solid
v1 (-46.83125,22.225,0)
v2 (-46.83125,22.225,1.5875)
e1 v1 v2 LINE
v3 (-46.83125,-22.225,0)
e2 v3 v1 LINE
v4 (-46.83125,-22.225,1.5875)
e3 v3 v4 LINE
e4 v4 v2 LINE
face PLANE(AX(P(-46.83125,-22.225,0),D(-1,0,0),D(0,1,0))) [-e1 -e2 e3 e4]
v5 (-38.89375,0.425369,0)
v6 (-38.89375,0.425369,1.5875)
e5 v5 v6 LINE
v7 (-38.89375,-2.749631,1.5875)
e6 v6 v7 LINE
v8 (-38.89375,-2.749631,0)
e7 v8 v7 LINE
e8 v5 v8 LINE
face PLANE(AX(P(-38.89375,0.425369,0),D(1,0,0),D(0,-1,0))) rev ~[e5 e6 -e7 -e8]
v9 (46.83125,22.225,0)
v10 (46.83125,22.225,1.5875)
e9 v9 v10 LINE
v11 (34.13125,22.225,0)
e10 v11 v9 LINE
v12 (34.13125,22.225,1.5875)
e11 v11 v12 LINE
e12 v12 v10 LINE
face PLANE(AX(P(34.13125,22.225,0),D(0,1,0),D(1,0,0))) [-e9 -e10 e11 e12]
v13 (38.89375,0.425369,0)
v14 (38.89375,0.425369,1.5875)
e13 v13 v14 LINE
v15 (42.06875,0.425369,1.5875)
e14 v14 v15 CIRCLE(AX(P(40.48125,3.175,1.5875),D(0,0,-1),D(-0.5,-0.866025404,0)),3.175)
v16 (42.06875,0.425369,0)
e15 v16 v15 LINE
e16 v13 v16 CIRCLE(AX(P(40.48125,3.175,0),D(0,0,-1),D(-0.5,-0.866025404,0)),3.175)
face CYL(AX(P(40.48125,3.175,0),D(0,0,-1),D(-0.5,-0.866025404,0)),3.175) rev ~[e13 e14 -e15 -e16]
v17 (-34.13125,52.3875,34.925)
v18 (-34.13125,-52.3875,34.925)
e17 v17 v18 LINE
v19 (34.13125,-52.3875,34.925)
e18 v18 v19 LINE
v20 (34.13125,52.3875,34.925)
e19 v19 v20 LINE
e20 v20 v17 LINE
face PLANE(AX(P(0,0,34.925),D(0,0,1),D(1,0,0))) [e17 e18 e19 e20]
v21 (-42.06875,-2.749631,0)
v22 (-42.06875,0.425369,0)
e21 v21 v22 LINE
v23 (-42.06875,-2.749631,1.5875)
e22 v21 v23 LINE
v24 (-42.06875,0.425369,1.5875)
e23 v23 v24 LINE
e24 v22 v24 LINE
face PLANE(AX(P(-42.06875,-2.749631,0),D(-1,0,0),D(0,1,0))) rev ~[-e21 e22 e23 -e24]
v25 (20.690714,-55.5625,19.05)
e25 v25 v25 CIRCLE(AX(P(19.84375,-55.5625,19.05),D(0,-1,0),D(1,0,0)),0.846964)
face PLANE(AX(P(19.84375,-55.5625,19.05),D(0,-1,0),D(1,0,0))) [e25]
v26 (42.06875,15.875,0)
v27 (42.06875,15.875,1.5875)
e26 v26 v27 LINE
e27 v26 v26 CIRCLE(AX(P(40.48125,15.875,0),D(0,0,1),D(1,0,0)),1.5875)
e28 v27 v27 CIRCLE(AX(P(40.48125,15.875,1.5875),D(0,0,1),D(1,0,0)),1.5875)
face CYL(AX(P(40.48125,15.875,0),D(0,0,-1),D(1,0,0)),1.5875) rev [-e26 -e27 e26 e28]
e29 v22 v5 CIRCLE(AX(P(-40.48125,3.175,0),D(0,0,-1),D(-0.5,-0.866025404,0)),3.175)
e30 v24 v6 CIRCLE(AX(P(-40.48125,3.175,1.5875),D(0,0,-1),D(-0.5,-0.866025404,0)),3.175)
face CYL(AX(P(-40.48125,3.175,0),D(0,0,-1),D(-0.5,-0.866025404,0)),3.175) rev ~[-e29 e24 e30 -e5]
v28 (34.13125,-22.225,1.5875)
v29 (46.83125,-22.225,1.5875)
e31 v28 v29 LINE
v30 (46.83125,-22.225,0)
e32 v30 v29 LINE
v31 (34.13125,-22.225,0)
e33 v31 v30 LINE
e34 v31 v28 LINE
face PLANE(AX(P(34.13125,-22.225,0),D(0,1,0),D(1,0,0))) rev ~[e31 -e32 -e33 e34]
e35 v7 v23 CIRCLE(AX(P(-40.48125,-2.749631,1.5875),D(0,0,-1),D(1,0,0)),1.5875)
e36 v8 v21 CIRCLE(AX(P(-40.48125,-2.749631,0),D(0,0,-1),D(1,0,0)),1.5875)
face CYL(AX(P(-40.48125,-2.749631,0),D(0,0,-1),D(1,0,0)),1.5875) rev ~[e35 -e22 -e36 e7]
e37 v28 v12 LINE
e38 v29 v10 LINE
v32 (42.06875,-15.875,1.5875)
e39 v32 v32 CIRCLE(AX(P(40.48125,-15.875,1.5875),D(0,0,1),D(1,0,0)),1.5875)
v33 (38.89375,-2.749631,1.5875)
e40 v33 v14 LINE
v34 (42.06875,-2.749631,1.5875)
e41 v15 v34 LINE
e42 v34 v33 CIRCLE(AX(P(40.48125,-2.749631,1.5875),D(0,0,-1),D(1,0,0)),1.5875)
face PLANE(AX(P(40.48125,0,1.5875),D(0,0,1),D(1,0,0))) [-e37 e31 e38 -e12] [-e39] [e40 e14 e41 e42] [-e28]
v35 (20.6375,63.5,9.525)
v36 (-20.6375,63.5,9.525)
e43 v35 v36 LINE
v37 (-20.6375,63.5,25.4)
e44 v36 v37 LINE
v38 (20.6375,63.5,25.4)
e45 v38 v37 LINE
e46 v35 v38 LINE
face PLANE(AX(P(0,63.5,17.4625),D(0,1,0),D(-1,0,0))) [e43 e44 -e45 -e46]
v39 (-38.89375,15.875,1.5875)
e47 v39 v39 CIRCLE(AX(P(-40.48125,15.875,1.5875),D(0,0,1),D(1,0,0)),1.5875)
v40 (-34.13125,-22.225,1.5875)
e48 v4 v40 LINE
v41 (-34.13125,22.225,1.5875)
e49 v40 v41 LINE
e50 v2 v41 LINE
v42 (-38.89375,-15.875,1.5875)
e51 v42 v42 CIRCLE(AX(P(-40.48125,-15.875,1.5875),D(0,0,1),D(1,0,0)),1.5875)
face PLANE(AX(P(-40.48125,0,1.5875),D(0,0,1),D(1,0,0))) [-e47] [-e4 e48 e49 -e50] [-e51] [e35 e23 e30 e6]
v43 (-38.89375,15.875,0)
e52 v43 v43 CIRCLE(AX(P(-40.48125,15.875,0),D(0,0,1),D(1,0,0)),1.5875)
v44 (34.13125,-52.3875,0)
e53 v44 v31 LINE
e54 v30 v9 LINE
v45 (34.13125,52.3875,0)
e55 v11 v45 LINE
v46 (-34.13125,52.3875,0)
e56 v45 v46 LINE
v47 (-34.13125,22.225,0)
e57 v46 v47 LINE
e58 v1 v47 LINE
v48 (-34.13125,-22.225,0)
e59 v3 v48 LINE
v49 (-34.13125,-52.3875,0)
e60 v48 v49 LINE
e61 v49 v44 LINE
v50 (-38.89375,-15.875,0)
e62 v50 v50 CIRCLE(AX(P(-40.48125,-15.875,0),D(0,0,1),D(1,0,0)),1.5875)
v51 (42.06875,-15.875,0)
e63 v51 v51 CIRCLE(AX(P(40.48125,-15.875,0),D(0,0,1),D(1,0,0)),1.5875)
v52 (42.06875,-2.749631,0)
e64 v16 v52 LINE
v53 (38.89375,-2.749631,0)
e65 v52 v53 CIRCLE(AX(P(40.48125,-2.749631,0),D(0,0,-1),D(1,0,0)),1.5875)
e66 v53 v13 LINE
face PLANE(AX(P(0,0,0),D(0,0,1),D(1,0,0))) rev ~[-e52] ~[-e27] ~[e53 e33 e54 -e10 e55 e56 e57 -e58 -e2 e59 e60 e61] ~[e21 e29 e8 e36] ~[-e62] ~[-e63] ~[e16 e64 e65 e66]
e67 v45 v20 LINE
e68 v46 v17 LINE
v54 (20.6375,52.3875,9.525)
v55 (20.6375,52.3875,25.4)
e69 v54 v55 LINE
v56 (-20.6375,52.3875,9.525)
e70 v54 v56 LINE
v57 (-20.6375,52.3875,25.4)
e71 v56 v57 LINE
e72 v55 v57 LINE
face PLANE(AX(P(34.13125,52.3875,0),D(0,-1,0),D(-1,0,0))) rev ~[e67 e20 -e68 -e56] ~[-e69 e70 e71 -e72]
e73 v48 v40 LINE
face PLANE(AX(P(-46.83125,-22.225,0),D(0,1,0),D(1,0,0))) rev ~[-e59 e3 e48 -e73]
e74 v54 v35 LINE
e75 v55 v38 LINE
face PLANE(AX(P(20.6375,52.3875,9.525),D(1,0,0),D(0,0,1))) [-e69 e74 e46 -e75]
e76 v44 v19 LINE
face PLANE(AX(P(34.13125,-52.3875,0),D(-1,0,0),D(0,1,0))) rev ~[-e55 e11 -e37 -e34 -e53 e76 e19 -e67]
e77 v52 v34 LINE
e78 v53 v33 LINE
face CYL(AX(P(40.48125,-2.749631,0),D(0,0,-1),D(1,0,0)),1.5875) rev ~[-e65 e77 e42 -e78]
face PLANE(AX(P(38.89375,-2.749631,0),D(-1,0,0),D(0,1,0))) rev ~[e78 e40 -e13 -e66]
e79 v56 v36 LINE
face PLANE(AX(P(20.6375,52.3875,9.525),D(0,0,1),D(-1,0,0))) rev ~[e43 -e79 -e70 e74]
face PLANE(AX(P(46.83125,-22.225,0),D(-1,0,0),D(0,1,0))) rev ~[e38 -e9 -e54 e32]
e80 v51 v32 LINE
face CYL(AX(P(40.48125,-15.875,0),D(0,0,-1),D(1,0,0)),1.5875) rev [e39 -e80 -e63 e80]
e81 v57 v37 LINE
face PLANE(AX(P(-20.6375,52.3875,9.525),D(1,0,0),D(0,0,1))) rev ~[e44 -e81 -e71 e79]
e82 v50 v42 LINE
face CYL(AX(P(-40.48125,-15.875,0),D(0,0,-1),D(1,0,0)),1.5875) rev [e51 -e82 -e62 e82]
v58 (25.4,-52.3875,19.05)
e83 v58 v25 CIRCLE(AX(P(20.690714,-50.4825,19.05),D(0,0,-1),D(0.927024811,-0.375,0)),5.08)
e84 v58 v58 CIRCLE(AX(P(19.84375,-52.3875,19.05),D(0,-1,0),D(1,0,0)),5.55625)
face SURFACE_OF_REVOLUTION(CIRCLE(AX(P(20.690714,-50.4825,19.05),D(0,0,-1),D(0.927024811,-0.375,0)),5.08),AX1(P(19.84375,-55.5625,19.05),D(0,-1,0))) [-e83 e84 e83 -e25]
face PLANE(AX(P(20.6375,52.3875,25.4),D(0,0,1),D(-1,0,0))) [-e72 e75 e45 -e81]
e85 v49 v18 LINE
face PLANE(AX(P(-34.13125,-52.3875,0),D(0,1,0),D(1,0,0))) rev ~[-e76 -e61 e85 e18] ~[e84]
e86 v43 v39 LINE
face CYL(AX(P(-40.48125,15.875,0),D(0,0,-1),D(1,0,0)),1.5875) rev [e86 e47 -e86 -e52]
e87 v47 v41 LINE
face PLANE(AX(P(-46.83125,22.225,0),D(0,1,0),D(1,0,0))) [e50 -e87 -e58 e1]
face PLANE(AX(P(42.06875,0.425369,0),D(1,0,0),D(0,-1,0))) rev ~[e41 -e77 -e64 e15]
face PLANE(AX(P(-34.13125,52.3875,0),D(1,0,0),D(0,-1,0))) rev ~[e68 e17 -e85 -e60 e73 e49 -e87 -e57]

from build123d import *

# Parameters (mm, degrees)
F1_DEPTH = 34.925
F0_W     = 12.7
F0_H     = 44.45
F0_R     = 1.5875
F2_DEPTH = 1.5875
F3_W     = 41.275
F3_H     = 15.875
F4_DEPTH = 11.1125
F5_R     = 5.55625
F6_DEPTH = 3.175


# Not quite as in the source:
# - a fillet or chamfer that OpenCascade refuses, or shapes differently, is made with other operations: its cross-section is extruded or revolved along the edge and cut away or added


with BuildPart() as f1:
    # F0 (on Top) → F1 (new body)
    with BuildSketch(Plane.XY):
        Polygon((34.13125, 22.225), (34.13125, 52.3875), (-34.13125, 52.3875), (-34.13125, 22.225), (-34.13125, -22.225), (-34.13125, -52.3875), (34.13125, -52.3875), (34.13125, -22.225), align=None)
    extrude(amount=F1_DEPTH)

    # F0 (on Top) → F2 (join)
    with BuildSketch(Plane.XY):
        with Locations((-40.48125, 0)):
            Rectangle(F0_W, F0_H)
        with Locations((-40.48125, -15.875)):
            Circle(F0_R, mode=Mode.SUBTRACT)
        with BuildLine():
            Line((-38.89375, 0.425369343), (-38.89375, -2.749630657))
            ThreePointArc((-38.89375, -2.749630657), (-40.48125, -4.337130657), (-42.06875, -2.749630657))
            Line((-42.06875, -2.749630657), (-42.06875, 0.425369343))
            ThreePointArc((-42.06875, 0.425369343), (-40.48125, 6.35), (-38.89375, 0.425369343))
        make_face(mode=Mode.SUBTRACT)
        with Locations((-40.48125, 15.875)):
            Circle(F0_R, mode=Mode.SUBTRACT)
        with Locations((40.48125, 0)):
            Rectangle(F0_W, F0_H)
        with Locations((40.48125, -15.875)):
            Circle(F0_R, mode=Mode.SUBTRACT)
        with BuildLine():
            ThreePointArc((38.89375, 0.425369343), (40.48125, 6.35), (42.06875, 0.425369343))
            Line((42.06875, 0.425369343), (42.06875, -2.749630657))
            ThreePointArc((42.06875, -2.749630657), (40.48125, -4.337130657), (38.89375, -2.749630657))
            Line((38.89375, -2.749630657), (38.89375, 0.425369343))
        make_face(mode=Mode.SUBTRACT)
        with Locations((40.48125, 15.875)):
            Circle(F0_R, mode=Mode.SUBTRACT)
    extrude(amount=F2_DEPTH)

    # F3 (on face) → F4 (join)
    with BuildSketch(Plane(origin=(0, 52.3875, 0), x_dir=(-1, 0, 0), z_dir=(0, 1, 0))):
        with Locations((0, 17.4625)):
            Rectangle(F3_W, F3_H)
    extrude(amount=F4_DEPTH)

    # F5 (on face) → F6 (join)
    with BuildSketch(Plane.XZ.offset(52.3875)):
        with Locations((19.84375, 19.05)):
            Circle(F5_R)
    extrude(amount=F6_DEPTH)

    # F7: fillet of radius 5.08 on 1 edges, made by hand

    # F7_s1 → F7_t2 (revolve, cut)
    with BuildSketch(Plane.XY.offset(19.05)):
        with BuildLine():
            ThreePointArc((25.4, -52.3875), (23.5305202921, -54.6946134838), (20.6907139607, -55.5625))
            Line((20.6907139607, -55.5625), (25.4, -55.5625))
            Line((25.4, -55.5625), (25.4, -52.3875))
        make_face()
    revolve(axis=Axis((19.84375, -55.5625, 19.05), (0, -1, 0)), mode=Mode.SUBTRACT)


solid = f1.part
